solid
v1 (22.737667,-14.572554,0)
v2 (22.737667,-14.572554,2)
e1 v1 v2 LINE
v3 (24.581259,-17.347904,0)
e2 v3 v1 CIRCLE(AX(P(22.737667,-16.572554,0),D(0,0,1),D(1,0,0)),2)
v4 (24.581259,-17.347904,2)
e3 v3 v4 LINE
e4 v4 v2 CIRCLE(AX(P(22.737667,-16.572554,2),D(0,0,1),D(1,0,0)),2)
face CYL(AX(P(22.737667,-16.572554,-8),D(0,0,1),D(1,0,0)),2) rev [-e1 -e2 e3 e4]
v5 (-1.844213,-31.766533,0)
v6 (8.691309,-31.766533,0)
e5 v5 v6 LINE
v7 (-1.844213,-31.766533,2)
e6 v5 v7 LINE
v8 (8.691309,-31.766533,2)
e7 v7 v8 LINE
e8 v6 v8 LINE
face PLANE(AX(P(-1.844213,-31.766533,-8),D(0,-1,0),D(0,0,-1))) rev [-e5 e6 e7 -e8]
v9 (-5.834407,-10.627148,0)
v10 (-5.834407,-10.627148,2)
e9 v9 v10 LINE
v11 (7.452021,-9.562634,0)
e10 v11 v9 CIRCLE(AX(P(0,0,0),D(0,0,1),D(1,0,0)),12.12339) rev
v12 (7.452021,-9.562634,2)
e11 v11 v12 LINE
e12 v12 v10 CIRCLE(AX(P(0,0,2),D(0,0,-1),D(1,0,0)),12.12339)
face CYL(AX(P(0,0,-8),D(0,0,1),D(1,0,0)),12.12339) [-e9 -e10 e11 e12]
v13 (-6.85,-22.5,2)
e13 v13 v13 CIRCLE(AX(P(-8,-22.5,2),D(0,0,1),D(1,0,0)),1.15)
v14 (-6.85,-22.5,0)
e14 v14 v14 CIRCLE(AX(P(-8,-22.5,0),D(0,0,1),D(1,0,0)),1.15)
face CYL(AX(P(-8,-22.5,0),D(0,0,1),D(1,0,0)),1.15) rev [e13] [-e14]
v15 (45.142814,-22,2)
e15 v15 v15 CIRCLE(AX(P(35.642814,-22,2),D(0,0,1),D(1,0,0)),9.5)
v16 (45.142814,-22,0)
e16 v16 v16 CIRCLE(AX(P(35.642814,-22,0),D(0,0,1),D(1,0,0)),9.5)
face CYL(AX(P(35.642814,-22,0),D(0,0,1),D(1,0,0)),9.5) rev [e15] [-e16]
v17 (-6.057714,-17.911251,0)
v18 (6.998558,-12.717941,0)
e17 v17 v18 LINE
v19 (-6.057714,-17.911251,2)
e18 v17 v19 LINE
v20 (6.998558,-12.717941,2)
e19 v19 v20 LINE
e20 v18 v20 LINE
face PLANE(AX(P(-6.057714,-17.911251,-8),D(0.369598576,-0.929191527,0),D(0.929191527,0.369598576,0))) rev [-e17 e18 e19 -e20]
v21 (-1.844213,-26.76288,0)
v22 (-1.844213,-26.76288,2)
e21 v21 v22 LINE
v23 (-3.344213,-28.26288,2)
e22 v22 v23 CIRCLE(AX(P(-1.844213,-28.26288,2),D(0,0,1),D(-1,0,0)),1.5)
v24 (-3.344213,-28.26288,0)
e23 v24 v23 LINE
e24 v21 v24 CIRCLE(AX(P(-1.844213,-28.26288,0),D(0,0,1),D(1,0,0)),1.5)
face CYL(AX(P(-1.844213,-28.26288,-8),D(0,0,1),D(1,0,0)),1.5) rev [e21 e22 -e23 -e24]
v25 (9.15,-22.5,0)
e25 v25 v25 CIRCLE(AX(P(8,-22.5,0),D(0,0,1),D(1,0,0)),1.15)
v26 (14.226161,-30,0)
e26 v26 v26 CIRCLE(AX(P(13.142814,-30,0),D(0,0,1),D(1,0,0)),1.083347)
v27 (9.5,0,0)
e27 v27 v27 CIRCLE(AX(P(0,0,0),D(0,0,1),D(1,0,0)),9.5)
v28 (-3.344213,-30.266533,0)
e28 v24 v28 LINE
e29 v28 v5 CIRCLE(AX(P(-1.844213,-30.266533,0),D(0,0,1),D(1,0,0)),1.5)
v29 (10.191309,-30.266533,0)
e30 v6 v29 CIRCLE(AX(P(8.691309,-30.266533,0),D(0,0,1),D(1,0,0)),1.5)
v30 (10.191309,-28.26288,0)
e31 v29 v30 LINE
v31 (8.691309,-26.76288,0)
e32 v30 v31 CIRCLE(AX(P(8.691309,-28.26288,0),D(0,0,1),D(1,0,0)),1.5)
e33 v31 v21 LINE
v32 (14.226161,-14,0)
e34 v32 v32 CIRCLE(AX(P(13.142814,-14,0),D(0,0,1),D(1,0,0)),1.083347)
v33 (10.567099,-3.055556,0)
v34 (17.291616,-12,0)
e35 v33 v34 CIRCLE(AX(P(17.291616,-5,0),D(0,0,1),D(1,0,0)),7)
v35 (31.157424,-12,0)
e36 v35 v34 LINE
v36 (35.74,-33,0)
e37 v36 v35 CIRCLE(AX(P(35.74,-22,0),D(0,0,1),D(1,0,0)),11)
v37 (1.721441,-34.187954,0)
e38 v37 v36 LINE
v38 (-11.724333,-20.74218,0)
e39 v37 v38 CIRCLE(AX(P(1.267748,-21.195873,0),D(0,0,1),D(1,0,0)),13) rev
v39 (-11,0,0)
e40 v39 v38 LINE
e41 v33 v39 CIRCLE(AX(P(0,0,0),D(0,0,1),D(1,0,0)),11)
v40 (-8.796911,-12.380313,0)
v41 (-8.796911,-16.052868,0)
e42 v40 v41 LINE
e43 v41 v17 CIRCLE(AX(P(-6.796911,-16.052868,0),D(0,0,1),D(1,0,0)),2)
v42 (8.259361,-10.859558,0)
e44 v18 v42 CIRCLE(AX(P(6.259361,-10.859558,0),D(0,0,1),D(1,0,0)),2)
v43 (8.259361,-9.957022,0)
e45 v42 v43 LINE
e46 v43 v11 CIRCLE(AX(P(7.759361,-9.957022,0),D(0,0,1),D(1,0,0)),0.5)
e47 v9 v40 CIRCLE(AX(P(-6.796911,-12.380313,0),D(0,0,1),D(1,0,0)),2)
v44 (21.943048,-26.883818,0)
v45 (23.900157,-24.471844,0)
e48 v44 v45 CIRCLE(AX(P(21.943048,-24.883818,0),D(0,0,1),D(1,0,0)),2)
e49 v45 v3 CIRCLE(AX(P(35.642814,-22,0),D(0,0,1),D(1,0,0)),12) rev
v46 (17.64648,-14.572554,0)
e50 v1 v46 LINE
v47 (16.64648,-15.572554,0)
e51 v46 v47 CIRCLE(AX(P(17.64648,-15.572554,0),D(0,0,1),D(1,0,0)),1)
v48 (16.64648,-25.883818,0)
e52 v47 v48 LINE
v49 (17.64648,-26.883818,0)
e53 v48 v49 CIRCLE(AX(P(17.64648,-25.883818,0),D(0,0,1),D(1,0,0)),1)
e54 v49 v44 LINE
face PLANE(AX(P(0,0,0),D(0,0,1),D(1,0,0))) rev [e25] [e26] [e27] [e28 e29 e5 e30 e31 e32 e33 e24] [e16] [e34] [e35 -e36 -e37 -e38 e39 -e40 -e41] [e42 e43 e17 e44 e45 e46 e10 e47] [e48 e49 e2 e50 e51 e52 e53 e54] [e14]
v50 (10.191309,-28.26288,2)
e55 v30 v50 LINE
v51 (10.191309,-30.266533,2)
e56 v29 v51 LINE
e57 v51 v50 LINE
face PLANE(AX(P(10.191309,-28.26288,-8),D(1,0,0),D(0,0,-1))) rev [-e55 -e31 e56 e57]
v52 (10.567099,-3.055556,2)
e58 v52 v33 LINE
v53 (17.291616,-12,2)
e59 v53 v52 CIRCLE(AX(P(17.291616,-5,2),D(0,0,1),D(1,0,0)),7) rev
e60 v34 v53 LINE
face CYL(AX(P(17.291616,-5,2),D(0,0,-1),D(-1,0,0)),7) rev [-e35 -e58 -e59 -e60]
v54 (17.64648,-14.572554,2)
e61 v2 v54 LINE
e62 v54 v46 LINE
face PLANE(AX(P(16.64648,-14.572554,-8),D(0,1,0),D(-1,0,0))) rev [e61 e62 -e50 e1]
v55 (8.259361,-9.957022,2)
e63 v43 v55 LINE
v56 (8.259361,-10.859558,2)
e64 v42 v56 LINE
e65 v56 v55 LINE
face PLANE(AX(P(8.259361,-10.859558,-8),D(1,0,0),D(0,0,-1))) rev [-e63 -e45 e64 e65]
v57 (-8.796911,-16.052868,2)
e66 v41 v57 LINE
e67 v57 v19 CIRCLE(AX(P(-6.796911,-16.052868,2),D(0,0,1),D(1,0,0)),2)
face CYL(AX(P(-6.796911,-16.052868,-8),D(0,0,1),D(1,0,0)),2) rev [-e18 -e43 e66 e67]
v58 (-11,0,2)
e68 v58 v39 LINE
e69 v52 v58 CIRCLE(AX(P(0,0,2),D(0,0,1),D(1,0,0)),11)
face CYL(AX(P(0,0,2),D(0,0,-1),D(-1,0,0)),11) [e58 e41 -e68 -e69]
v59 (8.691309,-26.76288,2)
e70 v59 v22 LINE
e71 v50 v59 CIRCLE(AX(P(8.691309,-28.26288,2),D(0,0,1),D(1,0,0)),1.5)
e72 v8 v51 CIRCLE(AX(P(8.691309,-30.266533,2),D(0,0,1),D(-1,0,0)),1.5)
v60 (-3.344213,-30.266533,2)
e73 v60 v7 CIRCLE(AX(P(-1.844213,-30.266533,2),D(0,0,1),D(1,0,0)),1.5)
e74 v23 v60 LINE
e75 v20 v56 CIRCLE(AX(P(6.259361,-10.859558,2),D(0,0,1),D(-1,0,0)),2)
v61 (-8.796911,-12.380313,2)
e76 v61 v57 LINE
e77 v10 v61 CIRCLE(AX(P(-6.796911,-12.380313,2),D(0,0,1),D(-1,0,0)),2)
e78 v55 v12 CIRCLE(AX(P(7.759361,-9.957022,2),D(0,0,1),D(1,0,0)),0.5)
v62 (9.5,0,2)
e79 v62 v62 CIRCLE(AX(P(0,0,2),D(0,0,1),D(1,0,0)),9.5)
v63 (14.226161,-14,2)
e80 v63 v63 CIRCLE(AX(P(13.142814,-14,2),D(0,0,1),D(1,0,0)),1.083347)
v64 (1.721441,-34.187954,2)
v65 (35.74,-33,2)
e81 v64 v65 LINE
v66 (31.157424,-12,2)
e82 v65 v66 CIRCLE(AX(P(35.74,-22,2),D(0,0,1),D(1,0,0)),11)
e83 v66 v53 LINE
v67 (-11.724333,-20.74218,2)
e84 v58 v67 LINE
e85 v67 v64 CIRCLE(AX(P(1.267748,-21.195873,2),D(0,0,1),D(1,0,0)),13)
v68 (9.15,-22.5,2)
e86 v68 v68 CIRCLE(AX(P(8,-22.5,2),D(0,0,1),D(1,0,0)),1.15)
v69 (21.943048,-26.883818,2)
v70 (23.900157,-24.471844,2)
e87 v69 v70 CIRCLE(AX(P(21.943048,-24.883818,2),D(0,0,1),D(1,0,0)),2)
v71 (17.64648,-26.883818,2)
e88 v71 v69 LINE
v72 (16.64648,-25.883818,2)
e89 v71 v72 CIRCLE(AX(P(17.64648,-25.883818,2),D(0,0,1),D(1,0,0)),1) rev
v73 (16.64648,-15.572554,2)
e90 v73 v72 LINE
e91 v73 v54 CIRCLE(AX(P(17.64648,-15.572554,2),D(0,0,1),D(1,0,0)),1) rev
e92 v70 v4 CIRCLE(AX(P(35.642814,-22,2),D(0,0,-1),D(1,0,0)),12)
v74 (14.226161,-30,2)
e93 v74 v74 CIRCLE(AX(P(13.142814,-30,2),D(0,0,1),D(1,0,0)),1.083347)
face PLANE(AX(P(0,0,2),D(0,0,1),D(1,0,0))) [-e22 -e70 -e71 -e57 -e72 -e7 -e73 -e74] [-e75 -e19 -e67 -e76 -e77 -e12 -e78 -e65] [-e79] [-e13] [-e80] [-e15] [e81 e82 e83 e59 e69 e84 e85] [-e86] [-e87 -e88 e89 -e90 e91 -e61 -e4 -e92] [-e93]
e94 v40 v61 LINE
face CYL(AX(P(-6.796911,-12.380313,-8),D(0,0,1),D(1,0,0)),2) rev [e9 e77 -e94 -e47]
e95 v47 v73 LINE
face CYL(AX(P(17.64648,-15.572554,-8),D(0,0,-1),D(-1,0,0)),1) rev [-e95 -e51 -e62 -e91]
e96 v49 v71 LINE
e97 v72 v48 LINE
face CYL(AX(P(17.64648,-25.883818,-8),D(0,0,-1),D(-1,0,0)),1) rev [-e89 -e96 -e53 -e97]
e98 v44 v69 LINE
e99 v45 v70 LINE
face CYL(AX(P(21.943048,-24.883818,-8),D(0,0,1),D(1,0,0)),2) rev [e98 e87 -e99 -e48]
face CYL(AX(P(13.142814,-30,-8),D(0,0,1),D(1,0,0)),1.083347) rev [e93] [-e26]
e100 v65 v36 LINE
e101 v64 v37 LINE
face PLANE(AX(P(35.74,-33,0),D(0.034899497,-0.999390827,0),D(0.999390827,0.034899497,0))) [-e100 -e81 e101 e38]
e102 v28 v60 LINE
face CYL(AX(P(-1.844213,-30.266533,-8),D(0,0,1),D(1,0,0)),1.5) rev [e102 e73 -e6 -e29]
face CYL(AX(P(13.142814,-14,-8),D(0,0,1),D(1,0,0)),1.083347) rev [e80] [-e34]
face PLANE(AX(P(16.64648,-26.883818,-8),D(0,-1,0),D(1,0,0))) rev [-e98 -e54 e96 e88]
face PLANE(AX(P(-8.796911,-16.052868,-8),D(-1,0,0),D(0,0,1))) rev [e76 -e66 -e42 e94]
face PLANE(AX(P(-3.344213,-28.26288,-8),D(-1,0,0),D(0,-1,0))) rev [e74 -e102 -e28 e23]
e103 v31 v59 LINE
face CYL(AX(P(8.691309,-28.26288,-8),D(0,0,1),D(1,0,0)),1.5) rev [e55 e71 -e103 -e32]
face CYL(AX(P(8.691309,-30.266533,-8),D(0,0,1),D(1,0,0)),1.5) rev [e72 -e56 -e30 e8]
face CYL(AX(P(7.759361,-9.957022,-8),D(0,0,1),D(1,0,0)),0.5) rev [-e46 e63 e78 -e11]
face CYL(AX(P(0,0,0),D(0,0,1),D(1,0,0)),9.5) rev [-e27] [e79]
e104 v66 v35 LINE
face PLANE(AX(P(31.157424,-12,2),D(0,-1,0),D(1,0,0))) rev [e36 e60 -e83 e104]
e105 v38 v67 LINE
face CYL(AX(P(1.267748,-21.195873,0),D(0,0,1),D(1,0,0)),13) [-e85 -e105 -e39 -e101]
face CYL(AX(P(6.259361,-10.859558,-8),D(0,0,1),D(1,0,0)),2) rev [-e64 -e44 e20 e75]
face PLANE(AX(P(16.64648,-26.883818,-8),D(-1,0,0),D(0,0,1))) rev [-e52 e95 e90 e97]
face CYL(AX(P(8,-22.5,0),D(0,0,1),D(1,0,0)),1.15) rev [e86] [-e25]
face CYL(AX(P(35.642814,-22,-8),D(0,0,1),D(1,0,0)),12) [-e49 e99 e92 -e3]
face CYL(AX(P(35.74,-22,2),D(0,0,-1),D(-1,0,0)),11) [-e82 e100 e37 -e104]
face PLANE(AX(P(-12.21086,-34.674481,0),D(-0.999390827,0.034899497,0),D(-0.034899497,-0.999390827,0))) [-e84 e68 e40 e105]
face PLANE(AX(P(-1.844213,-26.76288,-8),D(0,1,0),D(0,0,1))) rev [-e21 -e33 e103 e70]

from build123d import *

# Parameters (mm, degrees)
SKETCH_3_R          = 9.5
EXTRUDE_1_DEPTH     = 2
EXTRUDE_START       = -2
EXTRUDE_2_DEPTH     = 2
FILLET_2_R          = 13
SKETCH_5_R          = 1.15
CUT_EXTRUDE_1_DEPTH = 58.948126493
SKETCH_6_R          = 9.5
CUT_EXTRUDE_2_DEPTH = 58.948126493
FILLET_3_R          = 8
FILLET_4_R          = 7
SKETCH_7_R          = 1.08334678
CUT_EXTRUDE_4_DEPTH = 10
CUT_EXTRUDE_5_DEPTH = 10
FILLET_5_R          = 1


with BuildPart() as part:
    # 草图3 → 凸台-拉伸1 (new body)
    with BuildSketch(Plane.XY):
        with BuildLine():
            Line((-11, 0), (-11, -33))
            Line((-11, -33), (35.74, -33))
            ThreePointArc((35.74, -33), (46.48709263, -19.65479212), (31.157424305, -12))
            Line((31.157424305, -12), (9, -12))
            Line((9, -12), (9, -6.32455532))
            ThreePointArc((9, -6.32455532), (3.31662479, 10.488088482), (-11, 0))
        make_face()
        Circle(SKETCH_3_R, mode=Mode.SUBTRACT)
        with Locations((35.74, -22)):
            Circle(SKETCH_3_R, mode=Mode.SUBTRACT)
    extrude(amount=EXTRUDE_1_DEPTH)

    # 草图4 → 凸台-拉伸2 (add)
    with BuildSketch(Plane.XY.offset(2).offset(EXTRUDE_START)):
        with BuildLine():
            Line((35.74, -33), (-12.210859555, -34.674480913))
            Line((-12.210859555, -34.674480913), (-11, 0))
            ThreePointArc((-11, 0), (3.31662479, 10.488088482), (9, -6.32455532))
            Line((9, -6.32455532), (9, -12))
            Line((9, -12), (31.157424305, -12))
            ThreePointArc((31.157424305, -12), (46.48709263, -19.65479212), (35.74, -33))
        make_face()
    extrude(amount=EXTRUDE_2_DEPTH)

    # 圆角2
    fillet_2_edges = [part.edges().sort_by_distance(p)[0] for p in [
        (-12.210859555, -34.674480913, 1),
    ]]
    fillet(fillet_2_edges, radius=FILLET_2_R)

    # 草图5 → 切除-拉伸1 (cut, through all)
    with BuildSketch(Plane.XY.offset(2)):
        with Locations((-8, -22.5)):
            Circle(SKETCH_5_R)
        with Locations((8, -22.5)):
            Circle(SKETCH_5_R)
    extrude(amount=-CUT_EXTRUDE_1_DEPTH, mode=Mode.SUBTRACT)

    # 草图6 → 切除-拉伸2 (cut, through all)
    with BuildSketch(Plane.XY.offset(2)):
        Circle(SKETCH_6_R)
        with Locations((35.642814002, -22)):
            Circle(SKETCH_6_R)
    extrude(amount=-CUT_EXTRUDE_2_DEPTH, mode=Mode.SUBTRACT)

    # 圆角3
    # the kernel refuses this fillet: 8 mm, written as the material it adds along each edge
    with BuildSketch(Plane(origin=(9, -12, 0), x_dir=(0, 1, 0), z_dir=(0, 0, 1))) as fillet_3_piece_1:
        with BuildLine():
            CenterArc((8, -7.654831322), FILLET_3_R, 106.89204914, 73.10795086)
            Line((0, -7.654831322), (-0.16, -7.654831322))
            Line((-0.16, -7.654831322), (-0.16, 0))
            Line((-0.16, 0), (0, 0.16))
            ThreePointArc((0, 0.16), (2.83772234, 0.16), (5.628953573, 0.153096626))
            Line((5.628953573, 0.153096626), (5.67544468, 0))
        make_face()
    extrude(amount=2)

    # 圆角4
    fillet_4_edges = [part.edges().sort_by_distance(p)[0] for p in [
        (9, -6.32455532, 1),
    ]]
    fillet(fillet_4_edges, radius=FILLET_4_R)

    # 草图7 → 切除-拉伸4 (cut)
    with BuildSketch(Plane.XY.offset(2)):
        with Locations((13.142814002, -14)):
            Circle(SKETCH_7_R)
        with Locations((13.142814002, -30)):
            Circle(SKETCH_7_R)
    extrude(amount=-CUT_EXTRUDE_4_DEPTH, mode=Mode.SUBTRACT)

    # 草图8 → 切除-拉伸5 (cut)
    with BuildSketch(Plane.XY.offset(2)):
        with BuildLine():
            Line((16.646480101, -26.883817545), (16.646480101, -14.57255416))
            Line((16.646480101, -14.57255416), (22.737666516, -14.57255416))
            ThreePointArc((22.737666516, -14.57255416), (24.403604511, -15.465914835), (24.581259014, -17.347903565))
            ThreePointArc((24.581259014, -17.347903565), (23.697285572, -20.857918339), (23.900157183, -24.47184361))
            ThreePointArc((23.900157183, -24.47184361), (23.496100815, -26.143986607), (21.943047713, -26.883817545))
            Line((21.943047713, -26.883817545), (16.646480101, -26.883817545))
        make_face()
        with BuildLine():
            Line((-1.844212644, -26.7628803), (8.691309214, -26.7628803))
            ThreePointArc((8.691309214, -26.7628803), (9.751969386, -27.202220128), (10.191309214, -28.2628803))
            Line((10.191309214, -28.2628803), (10.191309214, -30.26653293))
            ThreePointArc((10.191309214, -30.26653293), (9.751969386, -31.327193102), (8.691309214, -31.76653293))
            Line((8.691309214, -31.76653293), (-1.844212644, -31.76653293))
            ThreePointArc((-1.844212644, -31.76653293), (-2.904872816, -31.327193102), (-3.344212644, -30.26653293))
            Line((-3.344212644, -30.26653293), (-3.344212644, -28.2628803))
            ThreePointArc((-3.344212644, -28.2628803), (-2.904872816, -27.202220128), (-1.844212644, -26.7628803))
        make_face()
        with BuildLine():
            Line((-8.796911022, -16.052867786), (-8.796911022, -12.380312846))
            ThreePointArc((-8.796911022, -12.380312846), (-7.815486406, -10.659120182), (-5.834406834, -10.627148368))
            ThreePointArc((-5.834406834, -10.627148368), (0.968228408, -12.084664633), (7.452020697, -9.562634212))
            ThreePointArc((7.452020697, -9.562634212), (7.978826228, -9.507761331), (8.259361329, -9.957022011))
            Line((8.259361329, -9.957022011), (8.259361329, -10.859557769))
            ThreePointArc((8.259361329, -10.859557769), (7.914413338, -11.982412545), (6.99855848, -12.717940822))
            Line((6.99855848, -12.717940822), (-6.057713871, -17.911250839))
            ThreePointArc((-6.057713871, -17.911250839), (-7.919765799, -17.707919794), (-8.796911022, -16.052867786))
        make_face()
    extrude(amount=-CUT_EXTRUDE_5_DEPTH, mode=Mode.SUBTRACT)

    # 圆角5
    fillet_5_edges = [part.edges().sort_by_distance(p)[0] for p in [
        (16.646480101, -26.883817545, 1),
        (16.646480101, -14.57255416, 1),
    ]]
    fillet(fillet_5_edges, radius=FILLET_5_R)


solid = part.part
